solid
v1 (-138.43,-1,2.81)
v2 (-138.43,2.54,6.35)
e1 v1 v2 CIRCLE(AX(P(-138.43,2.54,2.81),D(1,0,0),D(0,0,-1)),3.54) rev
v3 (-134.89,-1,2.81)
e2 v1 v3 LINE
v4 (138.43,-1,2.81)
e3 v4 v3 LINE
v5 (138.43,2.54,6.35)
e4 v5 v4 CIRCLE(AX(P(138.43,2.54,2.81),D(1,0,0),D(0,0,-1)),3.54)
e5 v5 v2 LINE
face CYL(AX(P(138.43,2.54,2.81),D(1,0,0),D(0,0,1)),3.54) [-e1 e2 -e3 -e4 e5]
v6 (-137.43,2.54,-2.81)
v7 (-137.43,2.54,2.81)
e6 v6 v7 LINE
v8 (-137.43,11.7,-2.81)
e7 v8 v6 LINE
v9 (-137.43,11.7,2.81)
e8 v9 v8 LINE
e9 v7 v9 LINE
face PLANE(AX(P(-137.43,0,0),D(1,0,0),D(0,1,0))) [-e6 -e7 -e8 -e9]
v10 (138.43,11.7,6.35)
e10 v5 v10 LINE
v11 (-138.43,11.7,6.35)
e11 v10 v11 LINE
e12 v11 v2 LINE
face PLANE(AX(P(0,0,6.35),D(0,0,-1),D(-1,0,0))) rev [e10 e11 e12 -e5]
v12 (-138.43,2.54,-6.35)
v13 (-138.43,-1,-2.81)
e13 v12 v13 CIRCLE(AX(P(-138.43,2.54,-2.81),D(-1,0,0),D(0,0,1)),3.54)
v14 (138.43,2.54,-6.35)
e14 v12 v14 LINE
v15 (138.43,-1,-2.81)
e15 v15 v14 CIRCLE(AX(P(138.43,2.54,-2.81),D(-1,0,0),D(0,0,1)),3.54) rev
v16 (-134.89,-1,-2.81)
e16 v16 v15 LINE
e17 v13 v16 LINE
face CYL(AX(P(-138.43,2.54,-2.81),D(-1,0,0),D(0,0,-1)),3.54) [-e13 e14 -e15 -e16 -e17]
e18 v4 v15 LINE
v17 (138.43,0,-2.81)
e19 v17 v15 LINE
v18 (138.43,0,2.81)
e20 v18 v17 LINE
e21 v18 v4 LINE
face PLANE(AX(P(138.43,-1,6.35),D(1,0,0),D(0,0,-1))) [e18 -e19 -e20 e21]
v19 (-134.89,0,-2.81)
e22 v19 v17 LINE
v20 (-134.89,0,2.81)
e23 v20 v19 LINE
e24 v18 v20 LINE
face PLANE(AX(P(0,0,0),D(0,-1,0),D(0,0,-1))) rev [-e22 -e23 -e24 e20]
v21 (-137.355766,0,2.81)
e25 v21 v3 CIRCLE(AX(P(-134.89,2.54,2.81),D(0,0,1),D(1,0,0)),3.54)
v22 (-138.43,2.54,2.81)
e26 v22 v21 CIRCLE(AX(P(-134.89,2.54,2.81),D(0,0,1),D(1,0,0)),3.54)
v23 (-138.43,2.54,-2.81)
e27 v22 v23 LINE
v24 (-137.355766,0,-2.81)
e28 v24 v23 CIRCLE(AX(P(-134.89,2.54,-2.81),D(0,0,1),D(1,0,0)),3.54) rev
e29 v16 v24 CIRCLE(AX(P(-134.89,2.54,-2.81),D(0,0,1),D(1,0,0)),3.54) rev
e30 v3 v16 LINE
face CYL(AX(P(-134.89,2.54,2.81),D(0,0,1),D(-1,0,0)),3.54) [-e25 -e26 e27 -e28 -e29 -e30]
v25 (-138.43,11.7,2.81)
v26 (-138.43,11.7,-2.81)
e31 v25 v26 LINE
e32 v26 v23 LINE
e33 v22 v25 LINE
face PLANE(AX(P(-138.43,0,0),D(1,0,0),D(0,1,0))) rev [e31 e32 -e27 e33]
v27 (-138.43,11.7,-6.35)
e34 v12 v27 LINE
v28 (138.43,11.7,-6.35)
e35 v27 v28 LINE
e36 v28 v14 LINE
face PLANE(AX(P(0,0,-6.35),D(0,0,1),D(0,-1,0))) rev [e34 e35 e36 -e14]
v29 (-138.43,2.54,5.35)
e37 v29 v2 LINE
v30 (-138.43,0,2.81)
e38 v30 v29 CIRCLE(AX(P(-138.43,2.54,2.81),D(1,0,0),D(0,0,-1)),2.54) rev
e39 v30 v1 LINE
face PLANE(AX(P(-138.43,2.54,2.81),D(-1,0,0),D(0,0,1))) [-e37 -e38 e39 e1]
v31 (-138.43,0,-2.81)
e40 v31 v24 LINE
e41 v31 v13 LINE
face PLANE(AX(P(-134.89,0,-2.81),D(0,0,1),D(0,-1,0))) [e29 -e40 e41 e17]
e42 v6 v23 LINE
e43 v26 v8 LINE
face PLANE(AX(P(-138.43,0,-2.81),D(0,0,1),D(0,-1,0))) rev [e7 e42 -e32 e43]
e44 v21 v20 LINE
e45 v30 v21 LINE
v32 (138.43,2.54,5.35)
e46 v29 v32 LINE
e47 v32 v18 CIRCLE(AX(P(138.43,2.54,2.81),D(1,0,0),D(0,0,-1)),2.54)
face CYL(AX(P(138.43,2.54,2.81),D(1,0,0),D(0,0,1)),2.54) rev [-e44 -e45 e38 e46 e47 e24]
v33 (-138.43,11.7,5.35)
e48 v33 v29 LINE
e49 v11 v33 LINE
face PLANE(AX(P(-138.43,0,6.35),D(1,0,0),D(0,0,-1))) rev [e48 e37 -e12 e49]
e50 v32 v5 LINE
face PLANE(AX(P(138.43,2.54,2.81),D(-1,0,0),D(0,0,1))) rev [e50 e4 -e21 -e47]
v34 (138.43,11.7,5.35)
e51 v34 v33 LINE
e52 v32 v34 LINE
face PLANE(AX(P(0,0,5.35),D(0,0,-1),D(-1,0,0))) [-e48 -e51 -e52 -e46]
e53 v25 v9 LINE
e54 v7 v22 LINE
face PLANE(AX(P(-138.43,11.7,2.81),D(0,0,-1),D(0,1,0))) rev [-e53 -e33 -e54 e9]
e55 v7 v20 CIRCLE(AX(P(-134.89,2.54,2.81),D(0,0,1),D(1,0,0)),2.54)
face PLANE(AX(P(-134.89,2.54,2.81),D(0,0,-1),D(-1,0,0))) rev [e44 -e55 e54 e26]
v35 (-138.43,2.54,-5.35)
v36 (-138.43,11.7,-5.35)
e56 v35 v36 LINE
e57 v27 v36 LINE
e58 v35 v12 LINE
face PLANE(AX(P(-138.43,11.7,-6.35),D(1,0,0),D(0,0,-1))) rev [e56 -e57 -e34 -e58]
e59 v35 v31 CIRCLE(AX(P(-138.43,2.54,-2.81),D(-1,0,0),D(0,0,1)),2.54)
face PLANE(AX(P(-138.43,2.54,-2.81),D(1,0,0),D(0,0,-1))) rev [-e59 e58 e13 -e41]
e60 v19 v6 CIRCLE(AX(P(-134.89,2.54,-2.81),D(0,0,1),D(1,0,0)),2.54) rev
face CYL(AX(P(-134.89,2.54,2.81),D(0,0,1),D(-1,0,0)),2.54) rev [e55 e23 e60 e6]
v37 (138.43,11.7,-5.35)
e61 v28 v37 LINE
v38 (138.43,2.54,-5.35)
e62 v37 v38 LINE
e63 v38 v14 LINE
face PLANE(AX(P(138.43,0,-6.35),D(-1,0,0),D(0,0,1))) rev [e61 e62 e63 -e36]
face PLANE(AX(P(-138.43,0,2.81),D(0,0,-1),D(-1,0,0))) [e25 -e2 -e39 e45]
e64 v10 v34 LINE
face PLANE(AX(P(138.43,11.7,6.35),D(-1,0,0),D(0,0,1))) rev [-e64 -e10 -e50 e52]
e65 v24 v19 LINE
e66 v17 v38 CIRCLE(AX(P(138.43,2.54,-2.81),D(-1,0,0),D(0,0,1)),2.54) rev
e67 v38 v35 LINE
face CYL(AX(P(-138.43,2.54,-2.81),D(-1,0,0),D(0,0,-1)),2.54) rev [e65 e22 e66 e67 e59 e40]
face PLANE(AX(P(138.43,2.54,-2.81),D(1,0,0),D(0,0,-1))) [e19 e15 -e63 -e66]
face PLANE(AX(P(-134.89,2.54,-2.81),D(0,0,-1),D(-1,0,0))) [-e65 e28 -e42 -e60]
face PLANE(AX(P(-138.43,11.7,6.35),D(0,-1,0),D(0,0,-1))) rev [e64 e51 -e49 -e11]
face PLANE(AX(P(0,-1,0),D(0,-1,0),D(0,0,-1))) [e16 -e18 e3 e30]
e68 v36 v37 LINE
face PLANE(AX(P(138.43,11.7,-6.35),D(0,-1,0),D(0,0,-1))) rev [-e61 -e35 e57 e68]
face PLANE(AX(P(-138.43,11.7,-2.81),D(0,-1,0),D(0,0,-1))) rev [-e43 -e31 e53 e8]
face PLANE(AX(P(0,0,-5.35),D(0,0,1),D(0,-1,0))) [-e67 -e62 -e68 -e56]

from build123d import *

# Parameters (mm, degrees)
SKETCH10_W                   = 276.86
SKETCH10_H                   = 12.7
BASE_FLANGE1_DEPTH           = 1
EDGE_FLANGE1_STRIP_W         = 9.08
EDGE_FLANGE1_STRIP_H         = 1
EDGE_FLANGE1_STRIP_CUT_DEPTH = 276.86
EDGE_FLANGE1_DEPTH           = 276.86
EDGE_FLANGE2_STRIP_W         = 9.08
EDGE_FLANGE2_STRIP_H         = 1
EDGE_FLANGE2_STRIP_CUT_DEPTH = 276.86
EDGE_FLANGE2_DEPTH           = 276.86
EDGE_FLANGE3_STRIP_W         = 9.08
EDGE_FLANGE3_STRIP_H         = 1
EDGE_FLANGE3_STRIP_CUT_DEPTH = 5.62
EDGE_FLANGE3_DEPTH           = 5.62


# Sheet-metal steps are written as plain solids
with BuildPart() as part:
    # Sketch10 → Base-Flange1 (new body)
    with BuildSketch(Plane(origin=(0, 0, 0), x_dir=(1, 0, 0), z_dir=(0, 1, 0))):
        Rectangle(SKETCH10_W, SKETCH10_H)
    extrude(amount=-BASE_FLANGE1_DEPTH)

    # Edge-Flange1 strip (across the edge) → Edge-Flange1 strip cut (cut)
    with BuildSketch(Plane(origin=(138.43, 0, -6.35), x_dir=(0, 0, 1), z_dir=(-1, 0, 0))):
        with Locations((-1, -0.5)):
            Rectangle(EDGE_FLANGE1_STRIP_W, EDGE_FLANGE1_STRIP_H)
    extrude(amount=EDGE_FLANGE1_STRIP_CUT_DEPTH, mode=Mode.SUBTRACT)

    # Edge-Flange1 section (across the edge) → Edge-Flange1 (add)
    with BuildSketch(Plane(origin=(138.43, 0, -6.35), x_dir=(0, 0, 1), z_dir=(-1, 0, 0))):
        with BuildLine():
            Line((0, 2.54), (0, 11.7))
            Line((0, 11.7), (1, 11.7))
            Line((1, 11.7), (1, 2.54))
            ThreePointArc((1, 2.54), (1.743948776, 0.743948776), (3.54, 0))
            Line((3.54, 0), (3.54, -1))
            ThreePointArc((3.54, -1), (1.036841995, 0.036841995), (0, 2.54))
        make_face()
    extrude(amount=EDGE_FLANGE1_DEPTH)

    # Edge-Flange2 strip (across the edge) → Edge-Flange2 strip cut (cut)
    with BuildSketch(Plane(origin=(-138.43, 0, 6.35), x_dir=(0, 0, -1), z_dir=(1, 0, 0))):
        with Locations((-1, -0.5)):
            Rectangle(EDGE_FLANGE2_STRIP_W, EDGE_FLANGE2_STRIP_H)
    extrude(amount=EDGE_FLANGE2_STRIP_CUT_DEPTH, mode=Mode.SUBTRACT)

    # Edge-Flange2 section (across the edge) → Edge-Flange2 (add)
    with BuildSketch(Plane(origin=(-138.43, 0, 6.35), x_dir=(0, 0, -1), z_dir=(1, 0, 0))):
        with BuildLine():
            Line((0, 2.54), (0, 11.7))
            Line((0, 11.7), (1, 11.7))
            Line((1, 11.7), (1, 2.54))
            ThreePointArc((1, 2.54), (1.743948776, 0.743948776), (3.54, 0))
            Line((3.54, 0), (3.54, -1))
            ThreePointArc((3.54, -1), (1.036841995, 0.036841995), (0, 2.54))
        make_face()
    extrude(amount=EDGE_FLANGE2_DEPTH)

    # Edge-Flange3 strip (across the edge) → Edge-Flange3 strip cut (cut)
    with BuildSketch(Plane(origin=(-138.43, 0, -2.81), x_dir=(1, 0, 0), z_dir=(0, 0, 1))):
        with Locations((-1, -0.5)):
            Rectangle(EDGE_FLANGE3_STRIP_W, EDGE_FLANGE3_STRIP_H)
    extrude(amount=EDGE_FLANGE3_STRIP_CUT_DEPTH, mode=Mode.SUBTRACT)

    # Edge-Flange3 section (across the edge) → Edge-Flange3 (add)
    with BuildSketch(Plane(origin=(-138.43, 0, -2.81), x_dir=(1, 0, 0), z_dir=(0, 0, 1))):
        with BuildLine():
            Line((0, 2.54), (0, 11.7))
            Line((0, 11.7), (1, 11.7))
            Line((1, 11.7), (1, 2.54))
            ThreePointArc((1, 2.54), (1.743948776, 0.743948776), (3.54, 0))
            Line((3.54, 0), (3.54, -1))
            ThreePointArc((3.54, -1), (1.036841995, 0.036841995), (0, 2.54))
        make_face()
    extrude(amount=EDGE_FLANGE3_DEPTH)


solid = part.part
